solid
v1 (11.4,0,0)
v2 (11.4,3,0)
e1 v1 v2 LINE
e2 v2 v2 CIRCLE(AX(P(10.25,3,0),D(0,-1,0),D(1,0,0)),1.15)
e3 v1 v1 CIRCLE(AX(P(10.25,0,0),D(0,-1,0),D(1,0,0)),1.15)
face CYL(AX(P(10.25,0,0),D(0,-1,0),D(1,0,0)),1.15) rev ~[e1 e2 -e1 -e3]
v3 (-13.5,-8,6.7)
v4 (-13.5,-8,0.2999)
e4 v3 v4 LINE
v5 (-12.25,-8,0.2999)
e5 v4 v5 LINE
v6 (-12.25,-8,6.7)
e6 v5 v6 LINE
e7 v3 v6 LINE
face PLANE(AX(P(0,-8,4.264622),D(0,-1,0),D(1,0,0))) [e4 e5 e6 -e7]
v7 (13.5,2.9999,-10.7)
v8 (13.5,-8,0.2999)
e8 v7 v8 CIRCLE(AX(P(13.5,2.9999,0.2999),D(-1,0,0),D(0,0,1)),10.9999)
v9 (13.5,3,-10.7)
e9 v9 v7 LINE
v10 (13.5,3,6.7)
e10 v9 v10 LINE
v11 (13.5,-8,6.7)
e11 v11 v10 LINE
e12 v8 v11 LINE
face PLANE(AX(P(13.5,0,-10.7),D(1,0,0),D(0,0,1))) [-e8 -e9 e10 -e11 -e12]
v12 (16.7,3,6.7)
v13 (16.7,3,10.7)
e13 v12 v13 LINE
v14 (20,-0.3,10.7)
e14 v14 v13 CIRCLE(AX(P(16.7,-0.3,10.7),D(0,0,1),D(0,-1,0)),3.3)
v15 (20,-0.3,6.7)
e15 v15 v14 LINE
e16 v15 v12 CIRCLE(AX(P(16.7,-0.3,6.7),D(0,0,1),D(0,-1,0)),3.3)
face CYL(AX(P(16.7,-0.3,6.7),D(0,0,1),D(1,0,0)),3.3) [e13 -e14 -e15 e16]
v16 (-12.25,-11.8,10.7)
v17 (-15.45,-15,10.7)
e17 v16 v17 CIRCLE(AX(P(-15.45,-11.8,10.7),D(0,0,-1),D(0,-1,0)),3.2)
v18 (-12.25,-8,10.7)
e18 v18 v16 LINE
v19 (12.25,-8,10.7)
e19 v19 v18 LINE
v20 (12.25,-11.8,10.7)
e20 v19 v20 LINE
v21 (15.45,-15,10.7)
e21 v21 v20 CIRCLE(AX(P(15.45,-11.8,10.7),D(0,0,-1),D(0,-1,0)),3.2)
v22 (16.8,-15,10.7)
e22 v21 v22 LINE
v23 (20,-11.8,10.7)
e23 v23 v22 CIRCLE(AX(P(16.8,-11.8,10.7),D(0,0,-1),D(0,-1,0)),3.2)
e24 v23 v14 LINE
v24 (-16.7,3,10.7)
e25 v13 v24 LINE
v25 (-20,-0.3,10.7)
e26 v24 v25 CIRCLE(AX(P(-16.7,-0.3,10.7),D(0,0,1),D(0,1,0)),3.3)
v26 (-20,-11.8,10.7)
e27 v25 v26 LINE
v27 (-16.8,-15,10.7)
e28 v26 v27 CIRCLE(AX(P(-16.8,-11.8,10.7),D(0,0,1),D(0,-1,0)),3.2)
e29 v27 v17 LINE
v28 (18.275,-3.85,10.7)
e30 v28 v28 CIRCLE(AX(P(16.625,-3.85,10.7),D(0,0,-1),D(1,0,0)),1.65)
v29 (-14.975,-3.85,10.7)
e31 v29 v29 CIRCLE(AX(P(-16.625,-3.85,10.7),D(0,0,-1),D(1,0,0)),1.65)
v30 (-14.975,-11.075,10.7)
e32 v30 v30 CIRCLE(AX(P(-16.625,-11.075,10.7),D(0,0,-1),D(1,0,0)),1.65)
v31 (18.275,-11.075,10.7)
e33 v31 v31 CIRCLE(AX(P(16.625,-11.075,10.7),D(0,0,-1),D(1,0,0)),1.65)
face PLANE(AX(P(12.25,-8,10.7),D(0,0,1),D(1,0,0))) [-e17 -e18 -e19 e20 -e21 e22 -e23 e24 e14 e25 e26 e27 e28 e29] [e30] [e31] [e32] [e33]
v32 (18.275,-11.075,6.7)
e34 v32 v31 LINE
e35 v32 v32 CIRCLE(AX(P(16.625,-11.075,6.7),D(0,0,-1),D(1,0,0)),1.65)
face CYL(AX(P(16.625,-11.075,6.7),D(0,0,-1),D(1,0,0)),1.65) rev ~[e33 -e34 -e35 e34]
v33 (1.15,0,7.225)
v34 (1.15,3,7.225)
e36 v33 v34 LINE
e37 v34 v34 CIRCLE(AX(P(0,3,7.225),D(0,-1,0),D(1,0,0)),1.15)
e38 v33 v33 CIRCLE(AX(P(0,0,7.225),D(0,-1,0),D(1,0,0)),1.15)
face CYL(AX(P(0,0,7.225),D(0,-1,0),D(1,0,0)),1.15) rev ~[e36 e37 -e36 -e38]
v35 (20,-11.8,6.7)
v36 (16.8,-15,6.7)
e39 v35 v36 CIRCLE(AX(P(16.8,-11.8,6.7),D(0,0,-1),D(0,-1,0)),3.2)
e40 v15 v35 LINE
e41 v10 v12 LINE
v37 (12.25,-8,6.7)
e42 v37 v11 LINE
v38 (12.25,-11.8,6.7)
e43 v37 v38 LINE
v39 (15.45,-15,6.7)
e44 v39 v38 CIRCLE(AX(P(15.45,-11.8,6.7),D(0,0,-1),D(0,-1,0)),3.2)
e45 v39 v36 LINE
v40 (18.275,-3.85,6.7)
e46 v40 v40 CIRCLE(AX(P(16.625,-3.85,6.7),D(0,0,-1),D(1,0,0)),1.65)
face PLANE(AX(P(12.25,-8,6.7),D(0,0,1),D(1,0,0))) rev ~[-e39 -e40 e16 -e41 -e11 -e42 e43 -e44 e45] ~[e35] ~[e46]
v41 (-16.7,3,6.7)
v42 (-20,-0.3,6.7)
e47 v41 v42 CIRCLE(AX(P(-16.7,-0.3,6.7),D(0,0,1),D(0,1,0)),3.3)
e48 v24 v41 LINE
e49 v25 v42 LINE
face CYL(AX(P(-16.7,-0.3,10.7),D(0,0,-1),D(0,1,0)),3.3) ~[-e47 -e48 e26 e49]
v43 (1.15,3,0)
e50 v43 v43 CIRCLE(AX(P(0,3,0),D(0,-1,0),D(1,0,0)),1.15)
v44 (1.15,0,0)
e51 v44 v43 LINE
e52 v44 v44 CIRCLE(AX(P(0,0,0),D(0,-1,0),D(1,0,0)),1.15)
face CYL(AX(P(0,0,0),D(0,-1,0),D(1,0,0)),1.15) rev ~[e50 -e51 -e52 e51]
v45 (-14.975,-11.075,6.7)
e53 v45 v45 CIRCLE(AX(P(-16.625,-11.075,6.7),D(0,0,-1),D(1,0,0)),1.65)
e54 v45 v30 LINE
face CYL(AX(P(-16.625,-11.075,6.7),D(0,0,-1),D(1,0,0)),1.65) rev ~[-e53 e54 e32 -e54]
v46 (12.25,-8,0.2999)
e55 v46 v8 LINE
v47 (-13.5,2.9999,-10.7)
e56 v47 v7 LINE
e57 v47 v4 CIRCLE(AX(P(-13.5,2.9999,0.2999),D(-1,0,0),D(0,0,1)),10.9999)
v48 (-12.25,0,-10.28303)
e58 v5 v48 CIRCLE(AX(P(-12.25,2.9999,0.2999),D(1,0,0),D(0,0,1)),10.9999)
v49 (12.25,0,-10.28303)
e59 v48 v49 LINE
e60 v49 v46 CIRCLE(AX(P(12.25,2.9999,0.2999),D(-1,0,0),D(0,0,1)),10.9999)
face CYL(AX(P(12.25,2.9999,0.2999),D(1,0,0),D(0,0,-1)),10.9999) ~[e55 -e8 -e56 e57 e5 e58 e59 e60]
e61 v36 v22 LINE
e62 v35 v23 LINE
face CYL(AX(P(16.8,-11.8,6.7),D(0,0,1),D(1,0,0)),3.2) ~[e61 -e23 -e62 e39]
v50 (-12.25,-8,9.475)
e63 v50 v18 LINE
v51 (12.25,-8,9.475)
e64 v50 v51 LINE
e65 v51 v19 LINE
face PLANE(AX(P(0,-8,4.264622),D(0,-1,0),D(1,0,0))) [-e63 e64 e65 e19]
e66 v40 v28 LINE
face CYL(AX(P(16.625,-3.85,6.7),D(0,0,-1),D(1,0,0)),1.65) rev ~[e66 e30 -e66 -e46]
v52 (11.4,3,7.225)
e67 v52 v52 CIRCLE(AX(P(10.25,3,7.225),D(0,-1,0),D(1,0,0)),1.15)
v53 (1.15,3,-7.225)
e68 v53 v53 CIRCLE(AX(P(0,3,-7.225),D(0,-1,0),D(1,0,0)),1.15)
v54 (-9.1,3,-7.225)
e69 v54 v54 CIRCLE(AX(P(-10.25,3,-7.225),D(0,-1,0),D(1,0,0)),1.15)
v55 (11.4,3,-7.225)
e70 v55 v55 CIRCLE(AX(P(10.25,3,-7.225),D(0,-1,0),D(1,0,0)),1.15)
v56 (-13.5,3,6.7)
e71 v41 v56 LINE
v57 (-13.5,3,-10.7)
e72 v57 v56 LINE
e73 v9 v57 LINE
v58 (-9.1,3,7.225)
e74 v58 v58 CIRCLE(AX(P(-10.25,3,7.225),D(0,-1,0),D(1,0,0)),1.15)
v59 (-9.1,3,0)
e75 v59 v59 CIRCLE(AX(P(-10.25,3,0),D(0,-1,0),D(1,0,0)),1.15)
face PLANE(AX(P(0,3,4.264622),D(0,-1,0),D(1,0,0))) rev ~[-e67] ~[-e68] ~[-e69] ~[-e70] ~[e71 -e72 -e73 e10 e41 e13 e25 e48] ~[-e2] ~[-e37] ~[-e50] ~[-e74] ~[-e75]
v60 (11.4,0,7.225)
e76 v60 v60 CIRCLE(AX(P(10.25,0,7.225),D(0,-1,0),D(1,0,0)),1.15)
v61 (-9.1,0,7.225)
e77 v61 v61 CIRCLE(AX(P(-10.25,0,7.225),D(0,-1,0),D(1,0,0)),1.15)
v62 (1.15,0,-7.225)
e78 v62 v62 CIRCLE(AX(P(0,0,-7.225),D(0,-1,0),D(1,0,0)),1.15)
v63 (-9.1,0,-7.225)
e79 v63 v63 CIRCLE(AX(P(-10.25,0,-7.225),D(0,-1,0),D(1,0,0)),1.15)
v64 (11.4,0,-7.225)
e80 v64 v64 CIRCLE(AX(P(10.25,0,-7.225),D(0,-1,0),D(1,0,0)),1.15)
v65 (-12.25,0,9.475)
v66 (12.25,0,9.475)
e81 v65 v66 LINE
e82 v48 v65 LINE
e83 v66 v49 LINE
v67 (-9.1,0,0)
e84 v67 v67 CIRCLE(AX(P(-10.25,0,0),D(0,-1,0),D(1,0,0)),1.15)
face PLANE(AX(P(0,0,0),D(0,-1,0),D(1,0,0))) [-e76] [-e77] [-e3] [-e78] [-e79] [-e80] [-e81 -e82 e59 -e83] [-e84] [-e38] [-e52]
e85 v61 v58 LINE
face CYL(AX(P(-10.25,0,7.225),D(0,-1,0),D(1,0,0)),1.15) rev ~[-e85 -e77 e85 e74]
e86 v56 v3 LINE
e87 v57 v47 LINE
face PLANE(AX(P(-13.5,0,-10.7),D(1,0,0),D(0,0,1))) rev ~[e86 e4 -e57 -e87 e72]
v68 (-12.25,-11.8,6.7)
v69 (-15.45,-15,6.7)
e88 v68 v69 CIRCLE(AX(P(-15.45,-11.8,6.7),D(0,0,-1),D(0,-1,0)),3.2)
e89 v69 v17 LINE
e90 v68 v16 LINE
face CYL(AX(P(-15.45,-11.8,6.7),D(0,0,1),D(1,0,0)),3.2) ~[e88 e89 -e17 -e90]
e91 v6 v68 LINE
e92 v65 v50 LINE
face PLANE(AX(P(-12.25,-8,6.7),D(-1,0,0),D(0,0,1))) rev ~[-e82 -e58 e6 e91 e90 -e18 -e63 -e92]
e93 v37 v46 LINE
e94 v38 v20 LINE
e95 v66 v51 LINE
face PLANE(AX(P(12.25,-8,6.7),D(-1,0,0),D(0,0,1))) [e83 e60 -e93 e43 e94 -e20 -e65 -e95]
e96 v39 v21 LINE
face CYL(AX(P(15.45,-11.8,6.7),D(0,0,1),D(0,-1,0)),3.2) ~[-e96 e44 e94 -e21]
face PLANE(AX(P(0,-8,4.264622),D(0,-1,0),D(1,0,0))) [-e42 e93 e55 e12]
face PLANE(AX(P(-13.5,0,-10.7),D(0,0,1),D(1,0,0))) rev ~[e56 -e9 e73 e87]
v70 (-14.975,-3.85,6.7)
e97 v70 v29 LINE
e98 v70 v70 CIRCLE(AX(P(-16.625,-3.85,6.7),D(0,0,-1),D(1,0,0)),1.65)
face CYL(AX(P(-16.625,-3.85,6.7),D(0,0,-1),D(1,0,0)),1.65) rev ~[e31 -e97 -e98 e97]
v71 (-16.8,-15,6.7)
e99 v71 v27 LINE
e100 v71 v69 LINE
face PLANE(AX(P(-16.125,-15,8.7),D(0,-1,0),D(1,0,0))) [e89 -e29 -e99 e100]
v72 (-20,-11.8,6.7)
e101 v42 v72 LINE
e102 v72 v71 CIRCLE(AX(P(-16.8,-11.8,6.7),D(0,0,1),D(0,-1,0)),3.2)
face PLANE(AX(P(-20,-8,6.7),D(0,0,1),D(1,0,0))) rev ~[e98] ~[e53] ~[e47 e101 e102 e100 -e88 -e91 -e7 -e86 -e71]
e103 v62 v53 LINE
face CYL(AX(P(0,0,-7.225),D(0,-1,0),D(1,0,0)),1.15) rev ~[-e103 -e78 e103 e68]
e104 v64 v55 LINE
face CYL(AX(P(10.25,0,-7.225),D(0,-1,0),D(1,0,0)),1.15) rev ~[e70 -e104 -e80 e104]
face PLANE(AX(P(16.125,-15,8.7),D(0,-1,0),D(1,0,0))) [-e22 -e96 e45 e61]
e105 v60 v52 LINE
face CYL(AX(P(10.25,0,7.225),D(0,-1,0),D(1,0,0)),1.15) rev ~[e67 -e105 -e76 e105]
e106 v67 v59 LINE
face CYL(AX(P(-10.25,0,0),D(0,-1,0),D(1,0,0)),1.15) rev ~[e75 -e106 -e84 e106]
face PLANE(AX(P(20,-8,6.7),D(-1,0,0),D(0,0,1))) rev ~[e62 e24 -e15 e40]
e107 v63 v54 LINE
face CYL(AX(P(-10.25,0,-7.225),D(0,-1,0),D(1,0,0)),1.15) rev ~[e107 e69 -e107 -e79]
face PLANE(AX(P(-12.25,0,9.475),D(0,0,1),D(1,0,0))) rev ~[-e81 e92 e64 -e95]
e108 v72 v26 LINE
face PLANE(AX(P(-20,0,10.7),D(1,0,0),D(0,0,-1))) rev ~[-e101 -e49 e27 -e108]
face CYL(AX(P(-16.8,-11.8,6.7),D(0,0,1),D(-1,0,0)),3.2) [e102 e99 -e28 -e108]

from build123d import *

# Parameters (mm, degrees)
F0_W          = 27
F0_H          = 21.4
F1_DEPTH      = 3
F2_R          = 1.15
F3_DEPTH      = 3.001
F5_DEPTH      = 8
F5_DEPTH_BACK = 3
F6_W          = 7.75
F6_H          = 4
F7_DEPTH      = 7
F8_R          = 1.65
F9_DEPTH      = 25
F10_F1_R      = 10.9999
F11_R         = 3.3
F12_R         = 3.2


# Not quite as in the source:
# - a fillet or chamfer is up to 0.001 mm smaller than in the source, because OpenCascade refuses the exact size


with BuildPart() as f1:
    # F0 (on Front) → F1 (new body)
    with BuildSketch(Plane.XZ):
        Rectangle(F0_W, F0_H)
    extrude(amount=-F1_DEPTH)

    # F2 (on Front) → F3 (cut, through all)
    with BuildSketch(Plane.XZ):
        with Locations((0, 7.225)):
            Circle(F2_R)
        Circle(F2_R)
        with Locations((0, -7.225)):
            Circle(F2_R)
        with Locations((10.25, 0)):
            Circle(F2_R)
        with Locations((10.25, 7.225)):
            Circle(F2_R)
        with Locations((10.25, -7.225)):
            Circle(F2_R)
        with Locations((-10.25, -7.225)):
            Circle(F2_R)
        with Locations((-10.25, 0)):
            Circle(F2_R)
        with Locations((-10.25, 7.225)):
            Circle(F2_R)
    extrude(amount=-F3_DEPTH, mode=Mode.SUBTRACT)

    # F4 (on Front) → F5 (join, two sides)
    with BuildSketch(Plane.XZ) as f5_sk:
        Polygon((20, 10.7), (0, 10.7), (-20, 10.7), (-20, 6.7), (-13.5, 6.7), (-13.5, -10.7), (-12.25, -10.7), (-12.25, 9.475), (0, 9.475), (12.25, 9.475), (12.25, -10.7), (13.5, -10.7), (13.5, 6.7), (20, 6.7), align=None)
    extrude(amount=F5_DEPTH)
    extrude(f5_sk.sketch, amount=-F5_DEPTH_BACK)

    # F6 (on face) → F7 (join)
    with BuildSketch(Plane.XZ.offset(8)):
        with Locations((16.125, 8.7)):
            Rectangle(F6_W, F6_H)
        with Locations((-16.125, 8.7)):
            Rectangle(F6_W, F6_H)
    extrude(amount=F7_DEPTH)

    # F8 (on face) → F9 (cut)
    with BuildSketch(Plane(origin=(0, 0, 6.7), x_dir=(1, 0, 0), z_dir=(0, 0, -1))):
        with Locations((-16.625, 3.85)):
            Circle(F8_R)
        with Locations((16.625, 3.85)):
            Circle(F8_R)
        with Locations((16.625, 11.075)):
            Circle(F8_R)
        with Locations((-16.625, 11.075)):
            Circle(F8_R)
    extrude(amount=-F9_DEPTH, mode=Mode.SUBTRACT)

    # F10: fillet of radius 11 on 2 edges, made by hand

    # F10_f1 (radius 11 in the source; OpenCascade refuses exactly that, so slightly less here)
    f10_f1_edges = [f1.edges().sort_by_distance(p)[0] for p in [
        (12.875, -8, -10.7),
    ]]
    fillet(f10_f1_edges, radius=F10_F1_R)

    # F11
    f11_edges = [f1.edges().sort_by_distance(p)[0] for p in [
        (20, 3, 8.7),
        (-20, 3, 8.7),
    ]]
    fillet(f11_edges, radius=F11_R)

    # F12
    f12_edges = [f1.edges().sort_by_distance(p)[0] for p in [
        (20, -15, 8.7),
        (12.25, -15, 8.7),
        (-12.25, -15, 8.7),
        (-20, -15, 8.7),
    ]]
    fillet(f12_edges, radius=F12_R)


solid = f1.part
